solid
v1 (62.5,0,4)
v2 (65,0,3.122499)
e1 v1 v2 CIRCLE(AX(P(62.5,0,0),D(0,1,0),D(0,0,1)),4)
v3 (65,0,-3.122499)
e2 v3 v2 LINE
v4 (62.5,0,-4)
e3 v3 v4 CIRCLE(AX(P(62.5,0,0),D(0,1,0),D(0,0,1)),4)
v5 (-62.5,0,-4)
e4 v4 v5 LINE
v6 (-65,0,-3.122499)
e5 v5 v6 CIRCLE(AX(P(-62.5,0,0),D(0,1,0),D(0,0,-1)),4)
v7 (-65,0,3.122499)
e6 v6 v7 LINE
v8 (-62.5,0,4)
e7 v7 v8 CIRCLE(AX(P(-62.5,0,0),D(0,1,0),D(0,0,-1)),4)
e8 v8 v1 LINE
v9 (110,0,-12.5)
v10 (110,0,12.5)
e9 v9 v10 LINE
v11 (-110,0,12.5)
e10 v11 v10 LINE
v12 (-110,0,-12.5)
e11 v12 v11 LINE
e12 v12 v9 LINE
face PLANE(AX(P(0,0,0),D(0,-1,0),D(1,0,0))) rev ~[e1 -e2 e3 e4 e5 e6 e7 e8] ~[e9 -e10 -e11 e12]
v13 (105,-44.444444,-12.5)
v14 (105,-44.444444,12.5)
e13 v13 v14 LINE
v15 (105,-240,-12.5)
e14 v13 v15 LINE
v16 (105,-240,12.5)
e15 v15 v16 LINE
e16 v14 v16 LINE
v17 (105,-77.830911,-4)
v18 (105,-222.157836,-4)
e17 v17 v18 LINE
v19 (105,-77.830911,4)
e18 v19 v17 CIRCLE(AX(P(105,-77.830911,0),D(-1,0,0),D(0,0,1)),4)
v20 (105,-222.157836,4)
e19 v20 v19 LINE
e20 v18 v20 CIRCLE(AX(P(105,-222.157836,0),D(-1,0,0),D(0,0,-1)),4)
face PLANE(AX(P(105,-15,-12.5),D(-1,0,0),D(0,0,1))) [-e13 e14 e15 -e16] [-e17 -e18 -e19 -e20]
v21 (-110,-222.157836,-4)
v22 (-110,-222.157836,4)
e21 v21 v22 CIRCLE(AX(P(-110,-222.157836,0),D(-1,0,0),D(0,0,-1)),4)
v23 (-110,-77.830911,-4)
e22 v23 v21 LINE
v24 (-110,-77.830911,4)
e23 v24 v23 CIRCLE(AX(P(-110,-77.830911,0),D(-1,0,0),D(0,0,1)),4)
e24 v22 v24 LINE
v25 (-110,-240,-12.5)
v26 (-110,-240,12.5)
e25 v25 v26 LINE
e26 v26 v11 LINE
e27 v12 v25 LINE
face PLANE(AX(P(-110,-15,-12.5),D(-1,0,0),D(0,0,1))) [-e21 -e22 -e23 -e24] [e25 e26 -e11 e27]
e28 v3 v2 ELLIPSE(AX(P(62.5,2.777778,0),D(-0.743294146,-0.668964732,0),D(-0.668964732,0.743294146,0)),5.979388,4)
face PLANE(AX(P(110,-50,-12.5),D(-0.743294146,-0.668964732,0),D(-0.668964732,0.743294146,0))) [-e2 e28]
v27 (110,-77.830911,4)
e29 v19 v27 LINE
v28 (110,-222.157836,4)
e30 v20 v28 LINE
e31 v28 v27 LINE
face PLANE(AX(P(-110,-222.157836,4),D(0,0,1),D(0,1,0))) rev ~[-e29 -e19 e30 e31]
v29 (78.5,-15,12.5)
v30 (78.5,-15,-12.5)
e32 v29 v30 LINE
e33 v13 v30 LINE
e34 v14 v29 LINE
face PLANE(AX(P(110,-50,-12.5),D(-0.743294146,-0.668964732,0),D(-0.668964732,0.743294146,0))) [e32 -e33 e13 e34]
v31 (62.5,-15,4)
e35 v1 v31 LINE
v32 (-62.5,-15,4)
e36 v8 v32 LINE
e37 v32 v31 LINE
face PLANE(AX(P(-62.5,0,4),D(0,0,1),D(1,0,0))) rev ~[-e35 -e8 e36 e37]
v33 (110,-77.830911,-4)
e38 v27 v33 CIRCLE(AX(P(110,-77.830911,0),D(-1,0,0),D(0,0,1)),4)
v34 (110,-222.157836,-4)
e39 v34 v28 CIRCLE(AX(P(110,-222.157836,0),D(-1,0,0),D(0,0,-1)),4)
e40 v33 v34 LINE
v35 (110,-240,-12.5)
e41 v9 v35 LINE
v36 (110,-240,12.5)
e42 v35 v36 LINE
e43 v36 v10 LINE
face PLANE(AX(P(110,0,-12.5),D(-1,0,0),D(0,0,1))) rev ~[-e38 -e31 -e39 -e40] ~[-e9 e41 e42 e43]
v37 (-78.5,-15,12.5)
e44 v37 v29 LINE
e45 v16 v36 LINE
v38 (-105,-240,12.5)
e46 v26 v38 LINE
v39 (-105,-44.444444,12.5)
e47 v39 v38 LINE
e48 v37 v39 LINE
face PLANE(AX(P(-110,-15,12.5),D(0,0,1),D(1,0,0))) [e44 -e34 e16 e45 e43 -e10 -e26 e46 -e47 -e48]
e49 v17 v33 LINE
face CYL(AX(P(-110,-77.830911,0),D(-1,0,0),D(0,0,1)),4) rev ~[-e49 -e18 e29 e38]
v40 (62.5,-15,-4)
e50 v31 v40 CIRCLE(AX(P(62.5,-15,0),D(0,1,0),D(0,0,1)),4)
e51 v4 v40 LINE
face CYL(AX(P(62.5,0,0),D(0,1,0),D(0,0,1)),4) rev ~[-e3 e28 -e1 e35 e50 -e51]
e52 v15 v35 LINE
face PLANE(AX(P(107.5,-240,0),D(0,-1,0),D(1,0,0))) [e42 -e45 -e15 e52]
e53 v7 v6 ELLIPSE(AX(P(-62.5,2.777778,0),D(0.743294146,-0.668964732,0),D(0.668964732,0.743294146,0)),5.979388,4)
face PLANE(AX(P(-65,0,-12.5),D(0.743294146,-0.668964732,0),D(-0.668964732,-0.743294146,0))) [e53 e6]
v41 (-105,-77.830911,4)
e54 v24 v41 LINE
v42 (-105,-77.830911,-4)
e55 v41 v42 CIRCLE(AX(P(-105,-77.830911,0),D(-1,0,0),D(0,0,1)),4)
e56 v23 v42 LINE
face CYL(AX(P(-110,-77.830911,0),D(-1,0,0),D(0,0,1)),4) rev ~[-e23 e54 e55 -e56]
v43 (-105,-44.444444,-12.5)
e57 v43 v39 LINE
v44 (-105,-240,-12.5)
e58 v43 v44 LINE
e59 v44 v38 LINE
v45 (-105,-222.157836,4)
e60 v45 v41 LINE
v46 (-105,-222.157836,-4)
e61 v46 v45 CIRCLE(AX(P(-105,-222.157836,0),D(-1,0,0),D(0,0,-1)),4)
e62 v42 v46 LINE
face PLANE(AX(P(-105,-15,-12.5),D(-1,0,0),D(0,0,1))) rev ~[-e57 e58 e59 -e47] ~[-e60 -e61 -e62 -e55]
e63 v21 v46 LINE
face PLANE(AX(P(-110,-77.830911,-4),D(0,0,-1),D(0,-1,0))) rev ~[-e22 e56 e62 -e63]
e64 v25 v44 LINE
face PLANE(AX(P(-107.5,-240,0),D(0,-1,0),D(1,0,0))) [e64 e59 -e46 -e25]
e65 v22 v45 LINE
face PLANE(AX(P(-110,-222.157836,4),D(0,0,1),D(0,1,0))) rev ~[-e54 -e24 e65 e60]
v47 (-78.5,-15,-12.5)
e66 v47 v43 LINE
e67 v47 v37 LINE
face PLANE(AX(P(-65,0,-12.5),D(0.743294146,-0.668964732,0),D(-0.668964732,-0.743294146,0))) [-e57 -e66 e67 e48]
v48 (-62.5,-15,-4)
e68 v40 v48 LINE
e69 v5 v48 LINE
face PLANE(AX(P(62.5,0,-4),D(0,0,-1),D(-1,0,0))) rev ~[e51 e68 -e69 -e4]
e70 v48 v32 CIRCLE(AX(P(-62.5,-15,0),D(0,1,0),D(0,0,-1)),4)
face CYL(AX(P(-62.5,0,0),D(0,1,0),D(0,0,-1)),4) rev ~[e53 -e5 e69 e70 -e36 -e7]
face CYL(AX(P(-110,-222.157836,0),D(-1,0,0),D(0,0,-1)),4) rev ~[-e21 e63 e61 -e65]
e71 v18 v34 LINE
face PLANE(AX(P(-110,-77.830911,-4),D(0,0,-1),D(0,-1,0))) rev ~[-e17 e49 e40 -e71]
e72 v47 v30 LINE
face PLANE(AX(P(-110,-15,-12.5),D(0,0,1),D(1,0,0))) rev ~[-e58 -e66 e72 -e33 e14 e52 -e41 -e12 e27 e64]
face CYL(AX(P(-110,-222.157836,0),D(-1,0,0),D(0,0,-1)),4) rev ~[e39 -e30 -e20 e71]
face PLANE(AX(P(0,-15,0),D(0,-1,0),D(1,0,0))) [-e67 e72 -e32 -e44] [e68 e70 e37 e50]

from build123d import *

# Parameters (mm, degrees)
F0_W     = 220
F0_H     = 25
F1_DEPTH = 15
F2_W     = 5
F2_H     = 25
F3_DEPTH = 225
F5_DEPTH = 25
F6_W     = 72.1634626389
F6_H     = 8
F7_DEPTH = 256


with BuildPart() as f1:
    # F0 (on Front) → F1 (new body)
    with BuildSketch(Plane.XZ):
        Rectangle(F0_W, F0_H)
        with BuildLine():
            Line((-62.5, 4), (62.5, 4))
            ThreePointArc((62.5, 4), (66.5, 0), (62.5, -4))
            Line((62.5, -4), (-62.5, -4))
            ThreePointArc((-62.5, -4), (-66.5, 0), (-62.5, 4))
        make_face(mode=Mode.SUBTRACT)
    extrude(amount=F1_DEPTH)

    # F2 (on face) → F3 (join)
    with BuildSketch(Plane.XZ.offset(15)):
        with Locations((-107.5, 0)):
            Rectangle(F2_W, F2_H)
        with Locations((107.5, 0)):
            Rectangle(F2_W, F2_H)
    extrude(amount=F3_DEPTH)

    # F4 (on face) → F5 (join)
    with BuildSketch(Plane(origin=(0, 0, -12.5), x_dir=(1, 0, 0), z_dir=(0, 0, -1))):
        Polygon((-110, 0), (-65, 0), (-110, 50), align=None)
        Polygon((65, 0), (110, 0), (110, 50), align=None)
    extrude(amount=-F5_DEPTH)

    # F6 (on face) → F7 (cut)
    with BuildSketch(Plane(origin=(-110, 0, 0), x_dir=(0, -1, 0), z_dir=(-1, 0, 0))):
        with Locations((186.076104641, 0)):
            Rectangle(F6_W, F6_H)
        with Locations((113.9126420021, 0)):
            Rectangle(F6_W, F6_H)
        with BuildLine():
            ThreePointArc((222.1578359604, -4), (226.1578359604, 0), (222.1578359604, 4))
            Line((222.1578359604, 4), (222.1578359604, -4))
        make_face()
        with BuildLine():
            Line((77.8309106827, -4), (77.8309106827, 4))
            ThreePointArc((77.8309106827, 4), (73.8309106827, 0), (77.8309106827, -4))
        make_face()
    extrude(amount=-F7_DEPTH, mode=Mode.SUBTRACT)


solid = f1.part
